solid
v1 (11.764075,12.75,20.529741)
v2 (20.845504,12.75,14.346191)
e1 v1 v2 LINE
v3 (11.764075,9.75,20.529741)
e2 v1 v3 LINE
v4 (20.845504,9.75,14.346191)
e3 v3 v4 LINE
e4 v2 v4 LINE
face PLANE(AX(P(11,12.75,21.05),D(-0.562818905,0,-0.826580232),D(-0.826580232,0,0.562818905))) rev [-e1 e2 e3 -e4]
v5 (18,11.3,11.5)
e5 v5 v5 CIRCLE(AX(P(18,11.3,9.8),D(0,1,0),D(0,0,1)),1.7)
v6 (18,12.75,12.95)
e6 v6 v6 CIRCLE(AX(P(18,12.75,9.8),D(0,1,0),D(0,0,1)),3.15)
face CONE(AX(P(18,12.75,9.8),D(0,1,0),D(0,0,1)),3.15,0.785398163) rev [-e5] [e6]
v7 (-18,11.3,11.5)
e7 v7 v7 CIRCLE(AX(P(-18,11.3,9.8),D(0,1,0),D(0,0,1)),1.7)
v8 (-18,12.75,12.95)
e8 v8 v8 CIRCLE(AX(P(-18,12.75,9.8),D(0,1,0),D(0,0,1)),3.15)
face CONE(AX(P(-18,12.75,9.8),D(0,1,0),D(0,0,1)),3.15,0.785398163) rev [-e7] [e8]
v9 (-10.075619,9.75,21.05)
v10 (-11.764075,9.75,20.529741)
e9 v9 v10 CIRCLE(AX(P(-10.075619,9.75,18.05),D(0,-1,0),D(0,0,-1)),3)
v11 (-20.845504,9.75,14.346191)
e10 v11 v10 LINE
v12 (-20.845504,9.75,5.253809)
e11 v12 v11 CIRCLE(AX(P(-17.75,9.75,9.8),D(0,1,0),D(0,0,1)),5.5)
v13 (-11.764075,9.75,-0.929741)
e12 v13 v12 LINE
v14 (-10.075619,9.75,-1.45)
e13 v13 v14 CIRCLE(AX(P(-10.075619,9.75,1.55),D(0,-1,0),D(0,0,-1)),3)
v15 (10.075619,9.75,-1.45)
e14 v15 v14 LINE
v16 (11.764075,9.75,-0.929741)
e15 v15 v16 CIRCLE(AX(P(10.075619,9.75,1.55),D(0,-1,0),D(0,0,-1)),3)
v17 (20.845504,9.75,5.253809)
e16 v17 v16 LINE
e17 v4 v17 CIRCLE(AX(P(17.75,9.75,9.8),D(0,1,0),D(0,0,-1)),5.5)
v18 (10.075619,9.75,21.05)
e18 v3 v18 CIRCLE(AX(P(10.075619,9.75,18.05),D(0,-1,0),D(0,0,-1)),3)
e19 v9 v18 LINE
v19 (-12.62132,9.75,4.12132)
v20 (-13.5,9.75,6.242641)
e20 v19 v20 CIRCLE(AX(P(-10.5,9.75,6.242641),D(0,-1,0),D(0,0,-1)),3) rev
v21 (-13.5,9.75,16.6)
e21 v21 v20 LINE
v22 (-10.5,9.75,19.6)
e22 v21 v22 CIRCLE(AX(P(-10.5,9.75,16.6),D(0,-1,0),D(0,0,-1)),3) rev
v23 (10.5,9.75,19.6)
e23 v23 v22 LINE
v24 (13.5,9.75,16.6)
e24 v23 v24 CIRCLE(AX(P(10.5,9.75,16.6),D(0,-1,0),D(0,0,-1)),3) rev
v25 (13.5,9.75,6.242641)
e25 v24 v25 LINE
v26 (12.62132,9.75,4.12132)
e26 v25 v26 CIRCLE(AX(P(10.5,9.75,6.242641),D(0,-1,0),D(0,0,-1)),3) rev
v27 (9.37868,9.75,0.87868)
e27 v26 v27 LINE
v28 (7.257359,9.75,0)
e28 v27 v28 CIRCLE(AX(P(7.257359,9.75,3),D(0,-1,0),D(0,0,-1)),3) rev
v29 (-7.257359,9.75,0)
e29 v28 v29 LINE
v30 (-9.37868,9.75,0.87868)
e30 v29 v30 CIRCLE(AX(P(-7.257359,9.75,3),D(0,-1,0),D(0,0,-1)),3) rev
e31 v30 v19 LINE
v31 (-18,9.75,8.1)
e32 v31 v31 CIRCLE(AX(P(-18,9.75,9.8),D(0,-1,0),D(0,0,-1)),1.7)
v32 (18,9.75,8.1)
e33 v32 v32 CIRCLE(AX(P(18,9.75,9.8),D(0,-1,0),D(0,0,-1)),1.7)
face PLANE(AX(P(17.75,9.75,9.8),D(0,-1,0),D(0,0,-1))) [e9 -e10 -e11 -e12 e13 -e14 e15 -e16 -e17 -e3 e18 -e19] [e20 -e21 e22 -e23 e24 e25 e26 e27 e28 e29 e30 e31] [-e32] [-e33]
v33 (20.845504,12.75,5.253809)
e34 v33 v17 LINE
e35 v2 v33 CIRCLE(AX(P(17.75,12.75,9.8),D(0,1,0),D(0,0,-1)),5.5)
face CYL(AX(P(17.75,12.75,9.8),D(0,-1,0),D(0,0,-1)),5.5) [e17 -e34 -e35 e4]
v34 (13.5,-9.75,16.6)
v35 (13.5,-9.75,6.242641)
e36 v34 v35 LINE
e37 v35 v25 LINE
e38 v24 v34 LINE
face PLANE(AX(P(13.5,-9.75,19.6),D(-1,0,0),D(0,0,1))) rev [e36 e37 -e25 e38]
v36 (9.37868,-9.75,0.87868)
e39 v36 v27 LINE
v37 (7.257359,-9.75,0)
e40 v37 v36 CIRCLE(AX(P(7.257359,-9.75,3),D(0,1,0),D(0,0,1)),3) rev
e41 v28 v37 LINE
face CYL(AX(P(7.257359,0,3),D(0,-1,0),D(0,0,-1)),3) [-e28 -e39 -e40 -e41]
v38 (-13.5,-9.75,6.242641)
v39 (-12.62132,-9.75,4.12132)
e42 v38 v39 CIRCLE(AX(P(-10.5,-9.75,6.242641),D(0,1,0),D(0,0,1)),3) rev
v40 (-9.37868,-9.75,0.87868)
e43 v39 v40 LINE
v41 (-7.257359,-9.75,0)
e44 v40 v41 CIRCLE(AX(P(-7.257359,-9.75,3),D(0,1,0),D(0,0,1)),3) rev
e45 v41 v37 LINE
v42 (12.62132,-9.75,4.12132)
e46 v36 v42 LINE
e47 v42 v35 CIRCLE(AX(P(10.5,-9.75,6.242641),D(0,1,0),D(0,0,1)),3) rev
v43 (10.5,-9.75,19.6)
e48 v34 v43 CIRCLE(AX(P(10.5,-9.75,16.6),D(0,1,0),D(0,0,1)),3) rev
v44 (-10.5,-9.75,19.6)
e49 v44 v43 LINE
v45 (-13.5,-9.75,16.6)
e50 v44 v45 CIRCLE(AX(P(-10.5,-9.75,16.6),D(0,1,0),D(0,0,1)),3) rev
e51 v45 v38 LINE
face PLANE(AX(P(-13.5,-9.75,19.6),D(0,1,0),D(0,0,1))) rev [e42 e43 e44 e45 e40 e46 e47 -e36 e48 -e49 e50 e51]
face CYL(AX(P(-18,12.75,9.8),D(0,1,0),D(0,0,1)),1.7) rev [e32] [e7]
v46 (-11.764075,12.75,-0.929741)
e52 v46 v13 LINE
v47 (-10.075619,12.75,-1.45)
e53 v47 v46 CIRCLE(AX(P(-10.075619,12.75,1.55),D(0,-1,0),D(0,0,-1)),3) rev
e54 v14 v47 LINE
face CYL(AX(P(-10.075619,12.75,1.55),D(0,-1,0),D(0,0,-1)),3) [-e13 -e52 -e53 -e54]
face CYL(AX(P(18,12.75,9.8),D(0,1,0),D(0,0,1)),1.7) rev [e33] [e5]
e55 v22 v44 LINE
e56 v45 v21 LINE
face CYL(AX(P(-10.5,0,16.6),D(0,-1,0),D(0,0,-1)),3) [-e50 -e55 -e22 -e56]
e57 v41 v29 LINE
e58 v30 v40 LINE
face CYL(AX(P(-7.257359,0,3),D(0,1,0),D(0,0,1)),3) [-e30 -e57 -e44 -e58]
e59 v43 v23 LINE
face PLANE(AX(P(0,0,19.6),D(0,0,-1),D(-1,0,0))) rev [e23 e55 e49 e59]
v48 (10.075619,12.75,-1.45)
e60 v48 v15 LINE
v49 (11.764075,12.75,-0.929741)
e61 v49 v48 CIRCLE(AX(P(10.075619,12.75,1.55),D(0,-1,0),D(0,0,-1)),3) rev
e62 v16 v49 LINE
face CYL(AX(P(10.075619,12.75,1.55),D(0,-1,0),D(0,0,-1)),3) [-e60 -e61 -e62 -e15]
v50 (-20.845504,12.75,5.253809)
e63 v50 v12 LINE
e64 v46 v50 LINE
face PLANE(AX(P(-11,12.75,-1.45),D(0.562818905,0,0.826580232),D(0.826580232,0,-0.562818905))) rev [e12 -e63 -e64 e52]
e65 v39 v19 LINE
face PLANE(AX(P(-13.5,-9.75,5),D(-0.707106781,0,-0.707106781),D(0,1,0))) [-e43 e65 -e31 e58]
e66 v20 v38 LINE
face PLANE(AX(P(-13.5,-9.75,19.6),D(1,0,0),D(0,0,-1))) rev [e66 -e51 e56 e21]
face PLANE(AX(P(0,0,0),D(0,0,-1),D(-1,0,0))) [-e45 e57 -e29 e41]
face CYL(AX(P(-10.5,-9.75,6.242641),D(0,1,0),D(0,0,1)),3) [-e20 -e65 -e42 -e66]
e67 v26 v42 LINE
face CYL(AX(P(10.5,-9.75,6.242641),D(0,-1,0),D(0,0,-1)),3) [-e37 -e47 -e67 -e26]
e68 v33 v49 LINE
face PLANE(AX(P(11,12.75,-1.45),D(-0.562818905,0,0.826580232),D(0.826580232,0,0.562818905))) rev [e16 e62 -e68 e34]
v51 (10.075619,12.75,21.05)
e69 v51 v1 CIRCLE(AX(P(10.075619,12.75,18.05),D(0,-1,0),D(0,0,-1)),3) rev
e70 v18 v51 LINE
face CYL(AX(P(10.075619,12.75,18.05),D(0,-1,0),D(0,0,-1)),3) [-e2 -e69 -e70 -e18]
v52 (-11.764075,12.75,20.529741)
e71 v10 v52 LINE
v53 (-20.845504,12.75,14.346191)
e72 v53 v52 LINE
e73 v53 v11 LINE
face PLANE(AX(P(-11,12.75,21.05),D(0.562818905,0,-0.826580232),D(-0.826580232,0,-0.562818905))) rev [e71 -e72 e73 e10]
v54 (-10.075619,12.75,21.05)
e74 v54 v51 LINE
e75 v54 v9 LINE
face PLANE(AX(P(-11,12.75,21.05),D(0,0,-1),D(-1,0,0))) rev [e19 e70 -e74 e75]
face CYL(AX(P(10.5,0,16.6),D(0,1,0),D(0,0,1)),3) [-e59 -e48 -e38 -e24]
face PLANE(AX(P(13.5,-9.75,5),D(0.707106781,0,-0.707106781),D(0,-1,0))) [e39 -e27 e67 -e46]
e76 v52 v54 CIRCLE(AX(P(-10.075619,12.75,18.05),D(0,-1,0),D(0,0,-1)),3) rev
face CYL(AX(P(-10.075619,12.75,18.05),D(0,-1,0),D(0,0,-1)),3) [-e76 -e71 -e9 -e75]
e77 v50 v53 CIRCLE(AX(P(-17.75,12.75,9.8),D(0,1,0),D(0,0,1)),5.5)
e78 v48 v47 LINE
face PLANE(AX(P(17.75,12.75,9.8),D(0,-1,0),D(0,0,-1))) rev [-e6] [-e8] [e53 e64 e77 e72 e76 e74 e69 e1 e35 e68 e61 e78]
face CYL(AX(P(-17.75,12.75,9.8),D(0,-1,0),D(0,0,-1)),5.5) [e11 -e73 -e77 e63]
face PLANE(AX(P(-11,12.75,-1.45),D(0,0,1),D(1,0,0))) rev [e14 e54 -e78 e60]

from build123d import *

# Parameters (mm, degrees)
SKIZZE1_W                                    = 27
SKIZZE1_H                                    = 19.5
AUFSATZ_LINEAR_AUSTRAGEN1_DEPTH              = 19.6
FASE1_SIZE                                   = 5
AUFSATZ_LINEAR_AUSTRAGEN2_DEPTH              = 3
VERRUNDUNG1_R                                = 3
FORMSENKUNG_F_R_M3_LINSENSENKSCHRAUB_2_COUNT = 2
FORMSENKUNG_F_R_M3_LINSENSENKSCHRAUB_2_PITCH = 36


with BuildPart() as part:
    # Skizze1 → Aufsatz-Linear austragen1 (new body)
    with BuildSketch(Plane.XY):
        Rectangle(SKIZZE1_W, SKIZZE1_H)
    extrude(amount=AUFSATZ_LINEAR_AUSTRAGEN1_DEPTH)

    # Fase1
    fase1_edges = [part.edges().sort_by_distance(p)[0] for p in [
        (-13.5, 0, 0),
        (13.5, 0, 0),
    ]]
    chamfer(fase1_edges, length=FASE1_SIZE)

    # Skizze2 → Aufsatz-Linear austragen2 (add)
    with BuildSketch(Plane(origin=(0, 9.75, 0), x_dir=(1, 0, 0), z_dir=(0, 1, 0))):
        with BuildLine():
            Line((-11, 1.45), (11, 1.45))
            Line((11, 1.45), (20.845503979, -5.253808724))
            ThreePointArc((20.845503979, -5.253808724), (23.25, -9.8), (20.845503979, -14.346191276))
            Line((20.845503979, -14.346191276), (11, -21.05))
            Line((11, -21.05), (-11, -21.05))
            Line((-11, -21.05), (-20.845503979, -14.346191276))
            ThreePointArc((-20.845503979, -14.346191276), (-23.25, -9.8), (-20.845503979, -5.253808724))
            Line((-20.845503979, -5.253808724), (-11, 1.45))
        make_face()
    extrude(amount=AUFSATZ_LINEAR_AUSTRAGEN2_DEPTH)

    # Verrundung1
    # the kernel refuses this fillet: 3 mm, written as the material it takes off along each edge
    with BuildSketch(Plane(origin=(-13.5, 9.75, 19.6), x_dir=(0, 0, -1), z_dir=(0, -1, 0))) as verrundung1_piece_1:
        with BuildLine():
            CenterArc((VERRUNDUNG1_R, VERRUNDUNG1_R), VERRUNDUNG1_R, 180, 90)
            Line((0, VERRUNDUNG1_R), (0, 0))
            Line((0, 0), (VERRUNDUNG1_R, 0))
        make_face()
    extrude(amount=27, mode=Mode.SUBTRACT)
    with BuildSketch(Plane(origin=(13.5, -12.856601718, 5), x_dir=(0, 0, 1), z_dir=(0, 1, 0)), Plane(origin=(-8.5, 9.75, 0), x_dir=(-0.7071067811865469, 0, 0.707106781186548), z_dir=(0, -1, 0)), Plane(origin=(-13.5, 9.75, 5), x_dir=(0, 0, 1), z_dir=(0, -1, 0))) as verrundung1_piece_2:
        with BuildLine():
            CenterArc((VERRUNDUNG1_R * 0.414213562373, -VERRUNDUNG1_R), VERRUNDUNG1_R, 90, 45)
            Line((-VERRUNDUNG1_R * 0.292893218813, -VERRUNDUNG1_R * 0.292893218813), (0, 0))
            Line((0, 0), (VERRUNDUNG1_R * 0.414213562373, 0))
        make_face()
    extrude(amount=22.606601718, mode=Mode.SUBTRACT)
    with BuildSketch(Plane(origin=(8.5, -12.856601718, 0), x_dir=(-1, 0, 0), z_dir=(0, 1, 0))) as verrundung1_piece_3:
        with BuildLine():
            CenterArc((VERRUNDUNG1_R * 0.414213562373, VERRUNDUNG1_R), VERRUNDUNG1_R, 225, 45)
            Line((-VERRUNDUNG1_R * 0.292893218813, VERRUNDUNG1_R * 0.292893218813), (0, 0))
            Line((0, 0), (VERRUNDUNG1_R * 0.414213562373, 0))
        make_face()
    extrude(amount=22.606601718, mode=Mode.SUBTRACT)
    with BuildSketch(Plane(origin=(11, 7.439046605, -1.45), x_dir=(0.8265802320093436, 0, 0.5628189052007578), z_dir=(0, 1, 0)), Plane(origin=(-11, 7.439046605, -1.45), x_dir=(1, 0, 0), z_dir=(0, 1, 0)), Plane(origin=(-11, 7.439046605, 21.05), x_dir=(-0.8265802320093435, 0, -0.5628189052007582), z_dir=(0, 1, 0))) as verrundung1_piece_4:
        with BuildLine():
            CenterArc((VERRUNDUNG1_R * 0.308127119377, -VERRUNDUNG1_R), VERRUNDUNG1_R, 90, 34.250968868)
            Line((-VERRUNDUNG1_R * 0.254691785823, -VERRUNDUNG1_R * 0.173419767991), (0, 0))
            Line((0, 0), (VERRUNDUNG1_R * 0.308127119377, 0))
        make_face()
    extrude(amount=7.621906791, mode=Mode.SUBTRACT)
    with BuildSketch(Plane(origin=(11, 7.439046605, 21.05), x_dir=(0.8265802320093447, 0, -0.5628189052007564), z_dir=(0, 1, 0))) as verrundung1_piece_5:
        with BuildLine():
            CenterArc((VERRUNDUNG1_R * 0.308127119377, VERRUNDUNG1_R), VERRUNDUNG1_R, 235.749031132, 34.250968868)
            Line((-VERRUNDUNG1_R * 0.254691785823, VERRUNDUNG1_R * 0.173419767991), (0, 0))
            Line((0, 0), (VERRUNDUNG1_R * 0.308127119377, 0))
        make_face()
    extrude(amount=7.621906791, mode=Mode.SUBTRACT)
    with BuildSketch(Plane(origin=(13.5, -17.25, 19.6), x_dir=(-1, 0, 0), z_dir=(0, 1, 0))) as verrundung1_piece_6:
        with BuildLine():
            CenterArc((VERRUNDUNG1_R, -VERRUNDUNG1_R), VERRUNDUNG1_R, 90, 90)
            Line((0, -VERRUNDUNG1_R), (0, 0))
            Line((0, 0), (VERRUNDUNG1_R, 0))
        make_face()
    extrude(amount=27, mode=Mode.SUBTRACT)

    # Skizze4 → Formsenkung für M3 Linsensenkschraube mit Schlitz1 (revolve, cut)
    with BuildSketch(Plane(origin=(-18, 12.75, 9.8), x_dir=(0, 0, 1), z_dir=(1, 0, 0))):
        Polygon((0, 0), (0, 3), (1.7, 3), (1.7, 1.45), (3.15, 0), align=None)
    formsenkung_f_r_m3_linsensenkschraube_mi = revolve(axis=Axis((-18, 19.1, 9.8), (0, -1, 0)), mode=Mode.SUBTRACT)

    # Formsenkung f_r M3 Linsensenkschraub 2: Formsenkung für M3 Linsensenkschraube mit Schlitz1 ×2
    with Locations(*[(i * FORMSENKUNG_F_R_M3_LINSENSENKSCHRAUB_2_PITCH, 0, 0) for i in range(1, FORMSENKUNG_F_R_M3_LINSENSENKSCHRAUB_2_COUNT)]):
        add(formsenkung_f_r_m3_linsensenkschraube_mi, mode=Mode.SUBTRACT)


solid = part.part
